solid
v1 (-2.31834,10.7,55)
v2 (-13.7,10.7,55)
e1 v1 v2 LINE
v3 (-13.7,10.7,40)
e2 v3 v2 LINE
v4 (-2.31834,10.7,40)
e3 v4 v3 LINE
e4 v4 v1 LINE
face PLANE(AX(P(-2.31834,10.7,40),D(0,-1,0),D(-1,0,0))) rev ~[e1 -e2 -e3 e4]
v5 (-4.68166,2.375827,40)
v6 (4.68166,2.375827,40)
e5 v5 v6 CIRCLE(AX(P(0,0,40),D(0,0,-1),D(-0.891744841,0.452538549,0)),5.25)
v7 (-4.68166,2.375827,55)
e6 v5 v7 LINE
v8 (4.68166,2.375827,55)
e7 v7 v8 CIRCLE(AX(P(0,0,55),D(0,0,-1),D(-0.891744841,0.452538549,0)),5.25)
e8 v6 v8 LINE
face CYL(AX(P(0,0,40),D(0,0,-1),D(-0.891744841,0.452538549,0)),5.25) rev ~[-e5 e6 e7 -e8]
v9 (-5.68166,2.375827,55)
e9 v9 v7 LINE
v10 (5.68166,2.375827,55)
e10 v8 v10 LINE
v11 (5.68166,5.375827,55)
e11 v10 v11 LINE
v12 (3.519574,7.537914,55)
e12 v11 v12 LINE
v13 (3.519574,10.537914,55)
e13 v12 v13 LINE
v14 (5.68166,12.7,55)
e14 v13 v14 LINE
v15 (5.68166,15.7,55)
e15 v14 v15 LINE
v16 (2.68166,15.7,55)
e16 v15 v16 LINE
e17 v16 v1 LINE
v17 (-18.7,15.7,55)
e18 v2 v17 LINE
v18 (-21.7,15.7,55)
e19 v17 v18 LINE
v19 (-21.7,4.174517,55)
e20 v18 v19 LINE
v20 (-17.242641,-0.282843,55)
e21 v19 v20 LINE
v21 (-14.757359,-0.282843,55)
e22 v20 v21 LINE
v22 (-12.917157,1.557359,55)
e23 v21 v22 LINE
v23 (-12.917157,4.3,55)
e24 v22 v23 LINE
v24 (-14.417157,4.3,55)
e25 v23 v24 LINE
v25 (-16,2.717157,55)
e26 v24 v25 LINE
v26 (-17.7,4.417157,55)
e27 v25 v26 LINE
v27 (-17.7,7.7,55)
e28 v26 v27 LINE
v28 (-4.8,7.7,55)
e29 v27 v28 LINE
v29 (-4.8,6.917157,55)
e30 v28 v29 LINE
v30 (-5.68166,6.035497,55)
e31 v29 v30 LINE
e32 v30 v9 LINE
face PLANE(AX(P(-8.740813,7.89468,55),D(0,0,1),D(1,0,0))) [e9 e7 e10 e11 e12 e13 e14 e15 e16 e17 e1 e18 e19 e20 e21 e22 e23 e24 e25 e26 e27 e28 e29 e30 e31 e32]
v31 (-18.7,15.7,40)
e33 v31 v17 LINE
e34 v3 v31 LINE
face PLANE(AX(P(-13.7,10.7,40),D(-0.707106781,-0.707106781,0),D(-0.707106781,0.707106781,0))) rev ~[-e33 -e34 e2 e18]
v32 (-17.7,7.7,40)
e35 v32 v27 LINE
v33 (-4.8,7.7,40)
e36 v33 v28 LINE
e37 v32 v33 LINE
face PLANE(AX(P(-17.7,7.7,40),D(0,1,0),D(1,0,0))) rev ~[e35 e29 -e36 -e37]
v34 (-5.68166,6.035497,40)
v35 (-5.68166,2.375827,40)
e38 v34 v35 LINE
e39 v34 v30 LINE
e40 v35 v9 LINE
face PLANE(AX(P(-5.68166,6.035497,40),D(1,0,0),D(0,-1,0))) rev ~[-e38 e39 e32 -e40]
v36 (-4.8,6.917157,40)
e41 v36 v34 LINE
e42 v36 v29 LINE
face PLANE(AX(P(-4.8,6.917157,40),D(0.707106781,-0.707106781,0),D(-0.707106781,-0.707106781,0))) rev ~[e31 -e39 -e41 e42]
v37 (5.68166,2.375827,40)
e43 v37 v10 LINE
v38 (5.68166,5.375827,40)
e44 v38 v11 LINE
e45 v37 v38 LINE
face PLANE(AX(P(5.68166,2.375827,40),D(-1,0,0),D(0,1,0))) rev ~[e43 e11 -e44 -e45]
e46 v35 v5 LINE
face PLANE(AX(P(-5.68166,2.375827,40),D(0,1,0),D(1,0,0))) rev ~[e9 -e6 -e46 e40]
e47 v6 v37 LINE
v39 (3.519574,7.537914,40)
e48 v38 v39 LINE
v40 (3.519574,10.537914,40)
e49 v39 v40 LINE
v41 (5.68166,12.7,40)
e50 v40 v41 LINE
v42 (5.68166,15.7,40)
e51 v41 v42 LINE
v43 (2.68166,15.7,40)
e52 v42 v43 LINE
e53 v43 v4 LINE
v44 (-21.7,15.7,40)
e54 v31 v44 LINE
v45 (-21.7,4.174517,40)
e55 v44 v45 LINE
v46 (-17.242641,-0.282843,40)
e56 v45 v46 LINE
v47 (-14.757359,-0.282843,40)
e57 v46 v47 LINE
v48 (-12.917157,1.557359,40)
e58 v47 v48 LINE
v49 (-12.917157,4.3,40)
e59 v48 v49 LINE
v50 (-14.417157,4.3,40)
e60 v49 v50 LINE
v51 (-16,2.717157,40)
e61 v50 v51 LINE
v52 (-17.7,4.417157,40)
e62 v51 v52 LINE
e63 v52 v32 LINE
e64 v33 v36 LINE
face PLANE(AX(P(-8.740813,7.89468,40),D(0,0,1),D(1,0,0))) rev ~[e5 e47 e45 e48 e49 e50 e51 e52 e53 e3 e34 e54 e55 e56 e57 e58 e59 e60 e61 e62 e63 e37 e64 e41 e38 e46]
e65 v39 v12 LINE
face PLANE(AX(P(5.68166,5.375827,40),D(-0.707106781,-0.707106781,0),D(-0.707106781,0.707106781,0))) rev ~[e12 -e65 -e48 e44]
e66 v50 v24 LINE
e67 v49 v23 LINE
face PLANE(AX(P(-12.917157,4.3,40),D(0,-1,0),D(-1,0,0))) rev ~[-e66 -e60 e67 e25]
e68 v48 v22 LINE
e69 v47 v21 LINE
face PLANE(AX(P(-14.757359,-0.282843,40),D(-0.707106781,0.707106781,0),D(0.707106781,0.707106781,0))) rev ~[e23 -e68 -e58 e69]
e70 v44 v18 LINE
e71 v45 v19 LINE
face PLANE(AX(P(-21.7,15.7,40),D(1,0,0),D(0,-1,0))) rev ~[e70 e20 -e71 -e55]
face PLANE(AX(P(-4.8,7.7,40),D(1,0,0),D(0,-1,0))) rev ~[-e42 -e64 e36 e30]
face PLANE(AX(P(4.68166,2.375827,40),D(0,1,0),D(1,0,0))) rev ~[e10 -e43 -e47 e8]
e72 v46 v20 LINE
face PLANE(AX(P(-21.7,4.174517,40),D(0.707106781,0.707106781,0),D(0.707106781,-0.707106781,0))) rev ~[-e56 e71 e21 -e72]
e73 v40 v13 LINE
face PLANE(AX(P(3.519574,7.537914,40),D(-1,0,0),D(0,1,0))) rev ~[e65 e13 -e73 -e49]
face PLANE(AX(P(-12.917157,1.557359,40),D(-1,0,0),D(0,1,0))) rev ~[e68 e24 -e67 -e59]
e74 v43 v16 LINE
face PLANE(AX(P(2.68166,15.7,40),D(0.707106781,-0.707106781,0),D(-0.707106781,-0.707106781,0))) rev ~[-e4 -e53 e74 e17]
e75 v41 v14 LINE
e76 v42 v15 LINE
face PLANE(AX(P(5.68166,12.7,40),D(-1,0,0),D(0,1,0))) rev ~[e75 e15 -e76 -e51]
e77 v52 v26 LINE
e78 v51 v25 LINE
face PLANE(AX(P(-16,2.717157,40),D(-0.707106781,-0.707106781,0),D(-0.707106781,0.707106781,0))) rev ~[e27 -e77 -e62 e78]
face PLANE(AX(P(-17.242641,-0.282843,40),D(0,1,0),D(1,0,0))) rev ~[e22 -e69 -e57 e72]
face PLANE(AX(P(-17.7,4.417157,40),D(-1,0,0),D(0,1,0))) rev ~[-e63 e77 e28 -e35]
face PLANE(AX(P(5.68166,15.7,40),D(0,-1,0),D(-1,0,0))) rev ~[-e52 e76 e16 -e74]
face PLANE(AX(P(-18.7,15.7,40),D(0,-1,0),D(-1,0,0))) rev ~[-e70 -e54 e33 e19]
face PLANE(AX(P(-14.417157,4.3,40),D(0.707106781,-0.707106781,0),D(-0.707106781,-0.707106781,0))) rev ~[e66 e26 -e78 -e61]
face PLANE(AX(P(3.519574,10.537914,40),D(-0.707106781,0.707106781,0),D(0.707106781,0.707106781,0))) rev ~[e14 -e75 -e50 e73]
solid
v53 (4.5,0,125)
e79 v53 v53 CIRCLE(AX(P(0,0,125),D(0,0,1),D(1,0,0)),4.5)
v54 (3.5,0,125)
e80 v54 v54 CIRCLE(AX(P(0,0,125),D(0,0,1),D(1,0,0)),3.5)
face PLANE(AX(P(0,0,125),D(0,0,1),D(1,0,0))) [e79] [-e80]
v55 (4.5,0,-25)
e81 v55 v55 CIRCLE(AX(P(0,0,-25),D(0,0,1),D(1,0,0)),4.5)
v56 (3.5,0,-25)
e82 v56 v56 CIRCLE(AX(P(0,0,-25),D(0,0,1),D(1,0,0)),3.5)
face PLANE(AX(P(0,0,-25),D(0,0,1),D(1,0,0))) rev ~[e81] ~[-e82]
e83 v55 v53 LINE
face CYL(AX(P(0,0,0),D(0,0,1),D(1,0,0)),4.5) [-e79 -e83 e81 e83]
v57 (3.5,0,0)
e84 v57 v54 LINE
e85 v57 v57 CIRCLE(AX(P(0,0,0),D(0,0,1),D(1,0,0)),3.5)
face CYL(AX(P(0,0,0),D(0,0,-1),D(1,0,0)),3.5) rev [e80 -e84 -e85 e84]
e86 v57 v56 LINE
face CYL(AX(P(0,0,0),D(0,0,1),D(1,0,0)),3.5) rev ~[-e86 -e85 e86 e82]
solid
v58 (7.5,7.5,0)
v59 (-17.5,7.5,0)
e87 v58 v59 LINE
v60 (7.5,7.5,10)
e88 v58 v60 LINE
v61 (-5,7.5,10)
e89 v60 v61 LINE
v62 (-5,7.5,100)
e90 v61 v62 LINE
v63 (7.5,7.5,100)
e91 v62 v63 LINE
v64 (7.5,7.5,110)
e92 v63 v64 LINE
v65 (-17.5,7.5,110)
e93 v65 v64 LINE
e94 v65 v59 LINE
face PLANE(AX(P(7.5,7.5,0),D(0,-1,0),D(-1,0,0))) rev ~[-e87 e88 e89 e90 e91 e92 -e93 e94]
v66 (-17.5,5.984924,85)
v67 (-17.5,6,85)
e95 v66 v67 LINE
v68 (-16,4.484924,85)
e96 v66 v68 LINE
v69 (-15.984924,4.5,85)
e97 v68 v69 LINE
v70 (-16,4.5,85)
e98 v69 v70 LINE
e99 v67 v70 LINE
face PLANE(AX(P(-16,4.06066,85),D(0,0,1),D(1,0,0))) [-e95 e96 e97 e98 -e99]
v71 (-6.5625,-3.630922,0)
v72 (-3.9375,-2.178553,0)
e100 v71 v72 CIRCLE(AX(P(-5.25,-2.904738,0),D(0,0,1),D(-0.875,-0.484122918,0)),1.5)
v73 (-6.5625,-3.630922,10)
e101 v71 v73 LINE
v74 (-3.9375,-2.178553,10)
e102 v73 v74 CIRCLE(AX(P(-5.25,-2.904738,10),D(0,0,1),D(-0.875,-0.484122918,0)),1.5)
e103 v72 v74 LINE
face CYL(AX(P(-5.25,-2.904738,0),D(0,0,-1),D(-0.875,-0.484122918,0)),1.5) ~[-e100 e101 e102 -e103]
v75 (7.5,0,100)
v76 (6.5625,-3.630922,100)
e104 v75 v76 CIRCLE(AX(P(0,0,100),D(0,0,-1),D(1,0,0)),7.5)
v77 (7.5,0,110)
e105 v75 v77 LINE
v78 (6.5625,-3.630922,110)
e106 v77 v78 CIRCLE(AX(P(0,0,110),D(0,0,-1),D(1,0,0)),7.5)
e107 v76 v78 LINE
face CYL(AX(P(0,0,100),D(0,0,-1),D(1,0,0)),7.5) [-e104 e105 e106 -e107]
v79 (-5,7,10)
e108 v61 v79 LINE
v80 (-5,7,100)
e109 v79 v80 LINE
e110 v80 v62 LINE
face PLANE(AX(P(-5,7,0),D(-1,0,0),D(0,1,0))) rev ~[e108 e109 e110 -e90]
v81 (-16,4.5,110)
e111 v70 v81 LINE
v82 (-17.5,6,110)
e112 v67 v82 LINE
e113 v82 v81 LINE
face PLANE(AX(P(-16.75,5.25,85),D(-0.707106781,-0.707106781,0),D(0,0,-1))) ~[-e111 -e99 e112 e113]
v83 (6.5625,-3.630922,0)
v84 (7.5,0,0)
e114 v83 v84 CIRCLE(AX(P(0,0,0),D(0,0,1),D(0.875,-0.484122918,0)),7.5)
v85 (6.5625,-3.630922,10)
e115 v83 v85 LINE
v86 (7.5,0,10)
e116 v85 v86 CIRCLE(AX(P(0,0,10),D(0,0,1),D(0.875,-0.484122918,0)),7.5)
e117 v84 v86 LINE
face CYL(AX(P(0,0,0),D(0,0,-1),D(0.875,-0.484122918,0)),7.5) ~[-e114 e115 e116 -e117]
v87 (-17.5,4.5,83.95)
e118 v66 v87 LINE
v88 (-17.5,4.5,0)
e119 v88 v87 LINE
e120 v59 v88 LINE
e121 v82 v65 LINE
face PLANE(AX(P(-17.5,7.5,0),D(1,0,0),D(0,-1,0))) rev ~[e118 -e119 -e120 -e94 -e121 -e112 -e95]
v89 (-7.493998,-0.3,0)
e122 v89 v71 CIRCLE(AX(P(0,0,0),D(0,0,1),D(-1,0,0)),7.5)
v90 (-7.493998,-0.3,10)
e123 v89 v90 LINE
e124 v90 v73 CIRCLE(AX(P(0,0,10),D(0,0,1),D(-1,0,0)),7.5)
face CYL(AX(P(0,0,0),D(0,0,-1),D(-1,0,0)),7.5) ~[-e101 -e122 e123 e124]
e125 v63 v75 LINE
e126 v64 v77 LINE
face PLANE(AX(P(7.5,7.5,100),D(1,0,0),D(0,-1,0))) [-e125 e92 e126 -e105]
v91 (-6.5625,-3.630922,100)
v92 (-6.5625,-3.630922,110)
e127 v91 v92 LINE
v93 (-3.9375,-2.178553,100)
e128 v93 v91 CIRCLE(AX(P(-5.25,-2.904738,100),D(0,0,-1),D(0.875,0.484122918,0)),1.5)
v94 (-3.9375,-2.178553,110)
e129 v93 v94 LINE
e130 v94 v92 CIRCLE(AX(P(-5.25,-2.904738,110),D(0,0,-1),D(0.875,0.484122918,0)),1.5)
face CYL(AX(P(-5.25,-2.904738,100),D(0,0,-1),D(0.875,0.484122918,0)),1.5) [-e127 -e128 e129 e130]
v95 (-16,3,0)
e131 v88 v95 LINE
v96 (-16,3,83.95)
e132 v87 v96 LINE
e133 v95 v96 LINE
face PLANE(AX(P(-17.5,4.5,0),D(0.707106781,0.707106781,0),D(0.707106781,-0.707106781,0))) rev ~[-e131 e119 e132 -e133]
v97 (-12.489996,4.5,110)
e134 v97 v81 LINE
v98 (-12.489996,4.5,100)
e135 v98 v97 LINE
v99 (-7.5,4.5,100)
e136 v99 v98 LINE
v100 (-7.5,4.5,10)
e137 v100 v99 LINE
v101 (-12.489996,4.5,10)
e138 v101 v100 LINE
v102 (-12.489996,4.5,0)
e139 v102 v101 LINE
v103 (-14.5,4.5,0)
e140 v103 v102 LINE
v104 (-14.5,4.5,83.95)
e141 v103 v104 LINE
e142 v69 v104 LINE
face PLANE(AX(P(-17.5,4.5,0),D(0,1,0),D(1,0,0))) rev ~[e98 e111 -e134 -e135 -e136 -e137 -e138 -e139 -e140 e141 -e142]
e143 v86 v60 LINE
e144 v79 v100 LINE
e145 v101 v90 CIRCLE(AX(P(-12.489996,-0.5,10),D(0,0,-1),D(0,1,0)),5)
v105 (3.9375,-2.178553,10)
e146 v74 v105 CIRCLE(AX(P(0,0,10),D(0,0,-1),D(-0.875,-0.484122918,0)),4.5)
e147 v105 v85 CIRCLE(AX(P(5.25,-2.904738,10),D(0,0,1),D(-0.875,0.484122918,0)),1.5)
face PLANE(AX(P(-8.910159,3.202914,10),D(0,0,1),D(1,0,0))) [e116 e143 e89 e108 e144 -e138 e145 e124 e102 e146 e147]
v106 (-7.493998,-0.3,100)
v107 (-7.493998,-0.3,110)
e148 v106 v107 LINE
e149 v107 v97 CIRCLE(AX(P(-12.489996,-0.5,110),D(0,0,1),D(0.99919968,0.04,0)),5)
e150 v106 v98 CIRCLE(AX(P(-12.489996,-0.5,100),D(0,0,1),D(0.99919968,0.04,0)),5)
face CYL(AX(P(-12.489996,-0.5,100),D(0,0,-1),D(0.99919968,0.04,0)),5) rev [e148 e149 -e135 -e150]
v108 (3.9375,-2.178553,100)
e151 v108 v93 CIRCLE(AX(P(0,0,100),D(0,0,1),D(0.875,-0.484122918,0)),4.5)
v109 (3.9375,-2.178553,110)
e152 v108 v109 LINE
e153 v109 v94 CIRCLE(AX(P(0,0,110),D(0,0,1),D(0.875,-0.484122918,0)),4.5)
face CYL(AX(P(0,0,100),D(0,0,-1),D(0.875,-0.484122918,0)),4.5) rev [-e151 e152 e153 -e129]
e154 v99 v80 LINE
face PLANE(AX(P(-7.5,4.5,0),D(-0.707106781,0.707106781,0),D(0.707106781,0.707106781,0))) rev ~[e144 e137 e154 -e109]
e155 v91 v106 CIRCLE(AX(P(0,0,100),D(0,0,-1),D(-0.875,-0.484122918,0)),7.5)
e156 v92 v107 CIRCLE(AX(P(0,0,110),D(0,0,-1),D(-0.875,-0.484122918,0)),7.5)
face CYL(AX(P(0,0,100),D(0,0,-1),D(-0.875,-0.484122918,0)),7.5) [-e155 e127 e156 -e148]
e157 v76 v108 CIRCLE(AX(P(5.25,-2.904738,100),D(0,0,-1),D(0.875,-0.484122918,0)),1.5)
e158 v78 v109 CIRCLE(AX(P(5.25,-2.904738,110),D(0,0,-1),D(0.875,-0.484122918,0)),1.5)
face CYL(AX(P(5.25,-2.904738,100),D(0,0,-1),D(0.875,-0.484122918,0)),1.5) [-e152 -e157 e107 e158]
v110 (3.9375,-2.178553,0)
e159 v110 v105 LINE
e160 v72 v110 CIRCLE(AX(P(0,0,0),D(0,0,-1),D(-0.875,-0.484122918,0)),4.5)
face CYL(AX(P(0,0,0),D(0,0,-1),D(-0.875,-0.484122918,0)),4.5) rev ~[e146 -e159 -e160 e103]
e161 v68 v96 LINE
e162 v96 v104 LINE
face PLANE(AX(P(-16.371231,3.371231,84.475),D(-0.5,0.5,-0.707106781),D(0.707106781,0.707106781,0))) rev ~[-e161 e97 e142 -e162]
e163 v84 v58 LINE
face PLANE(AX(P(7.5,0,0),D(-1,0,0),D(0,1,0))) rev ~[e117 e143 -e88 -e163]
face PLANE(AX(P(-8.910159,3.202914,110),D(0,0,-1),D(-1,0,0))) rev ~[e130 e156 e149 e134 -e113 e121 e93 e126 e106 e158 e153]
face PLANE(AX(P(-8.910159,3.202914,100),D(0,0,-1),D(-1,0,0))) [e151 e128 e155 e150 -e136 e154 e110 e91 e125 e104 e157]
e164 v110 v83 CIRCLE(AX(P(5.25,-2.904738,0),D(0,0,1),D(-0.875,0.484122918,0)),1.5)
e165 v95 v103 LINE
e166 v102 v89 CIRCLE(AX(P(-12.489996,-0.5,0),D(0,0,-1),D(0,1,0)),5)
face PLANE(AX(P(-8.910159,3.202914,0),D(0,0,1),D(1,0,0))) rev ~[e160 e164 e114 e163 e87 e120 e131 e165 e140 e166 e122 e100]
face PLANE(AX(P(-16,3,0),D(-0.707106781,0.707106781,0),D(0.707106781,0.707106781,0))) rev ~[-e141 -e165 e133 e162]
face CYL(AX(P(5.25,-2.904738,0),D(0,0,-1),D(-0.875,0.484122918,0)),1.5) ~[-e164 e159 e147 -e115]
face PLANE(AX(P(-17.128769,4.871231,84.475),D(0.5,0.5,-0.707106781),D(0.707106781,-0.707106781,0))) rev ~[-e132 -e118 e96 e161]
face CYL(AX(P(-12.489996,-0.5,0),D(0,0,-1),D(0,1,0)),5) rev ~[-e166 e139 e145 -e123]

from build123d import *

# Parameters (mm, degrees)
F3_DEPTH      = 10
F4_START      = -100
F4_DEPTH      = 10
F5_DEPTH      = 110
F6_DEPTH      = 85
F7_T1_DEPTH   = 10
F7_T3_DEPTH   = 10
F1_R          = 4.5
F1_R_2        = 3.5
F8_DEPTH      = 125
F8_DEPTH_BACK = 25
F9_START      = 40
F9_DEPTH      = 15
F10_SIZE      = 1.5
F11_SIZE      = 1.05


# Not quite as in the source:
# - a fillet or chamfer that OpenCascade refuses, or shapes differently, is made with other operations: its cross-section is extruded or revolved along the edge and cut away or added
# - a feature names something its author has since deleted; it is built from what else it names


with BuildPart() as f3:
    # F0 (on Top) → F3 (new body)
    with BuildSketch(Plane.XY):
        Polygon((-14.5, 4.5), (-7.5, 4.5), (-5, 7), (-5, 7.5), (-17.5, 7.5), (-17.5, 4.5), align=None)
        with BuildLine():
            ThreePointArc((-7.5, 0), (-7.2618437741, -1.875), (-6.5625, -3.6309218871))
            ThreePointArc((-6.5625, -3.6309218871), (-4.5238156226, -4.2172375097), (-3.9375, -2.1785531322))
            ThreePointArc((-3.9375, -2.1785531322), (0, 4.5), (3.9375, -2.1785531322))
            ThreePointArc((3.9375, -2.1785531322), (4.5238156226, -4.2172375097), (6.5625, -3.6309218871))
            ThreePointArc((6.5625, -3.6309218871), (7.2618437741, -1.875), (7.5, 0))
            Line((7.5, 0), (7.5, 7.5))
            Line((7.5, 7.5), (-5, 7.5))
            Line((-5, 7.5), (-5, 7))
            Line((-5, 7), (-7.5, 4.5))
            Line((-7.5, 4.5), (-7.5, 0))
        make_face()
    extrude(amount=F3_DEPTH)



with BuildPart() as f4:
    # F3_face (on face) → F4 (new body)
    with BuildSketch(Plane(origin=(-2.7583074733, 3.5975142137, 0), x_dir=(1, 0, 0), z_dir=(0, 0, -1)).offset(F4_START)):
        with BuildLine():
            Line((-14.7416925267, -3.9024857863), (10.2583074733, -3.9024857863))
            Line((10.2583074733, -3.9024857863), (10.2583074733, 3.5975142137))
            ThreePointArc((10.2583074733, 3.5975142137), (10.0201512474, 5.4725142137), (9.3208074733, 7.2284361007))
            ThreePointArc((9.3208074733, 7.2284361007), (7.2821230959, 7.8147517233), (6.6958074733, 5.7760673459))
            ThreePointArc((6.6958074733, 5.7760673459), (2.7583074733, -0.9024857863), (-1.1791925267, 5.7760673459))
            ThreePointArc((-1.1791925267, 5.7760673459), (-1.7655081493, 7.8147517233), (-3.8041925267, 7.2284361007))
            ThreePointArc((-3.8041925267, 7.2284361007), (-4.5035363009, 5.4725142137), (-4.7416925267, 3.5975142137))
            Line((-4.7416925267, 3.5975142137), (-4.7416925267, -0.9024857863))
            Line((-4.7416925267, -0.9024857863), (-14.7416925267, -0.9024857863))
            Line((-14.7416925267, -0.9024857863), (-14.7416925267, -3.9024857863))
        make_face()
    extrude(amount=-F4_DEPTH)


with BuildPart() as f3_1:
    add(f3.part)

    add(f4.part)  # F5 merges F4
    # F0 (on Top) → F5 (join, through all)
    with BuildSketch(Plane.XY):
        Polygon((-14.5, 4.5), (-7.5, 4.5), (-5, 7), (-5, 7.5), (-17.5, 7.5), (-17.5, 4.5), align=None)
    extrude(amount=F5_DEPTH)

    # F0 (on Top) → F6 (join)
    with BuildSketch(Plane.XY):
        Polygon((-16, 3), (-14.5, 4.5), (-17.5, 4.5), align=None)
    extrude(amount=F6_DEPTH)

    # F7: fillet of radius 5 on 2 edges, made by hand

    # F7_s2 → F7_t1 (join)
    with BuildSketch(Plane.XY):
        with BuildLine():
            ThreePointArc((-12.4899959968, 4.5), (-9.0258943817, 3.1055512755), (-7.4939975981, -0.3))
            Line((-7.4939975981, -0.3), (-6.9943977582, -0.28))
            ThreePointArc((-6.9943977582, -0.28), (-7, 0), (-7, 4.5))
            Line((-7, 4.5), (-7.5, 5))
            Line((-7.5, 5), (-12.4899959968, 5))
            Line((-12.4899959968, 5), (-12.4899959968, 4.5))
        make_face()
    extrude(amount=F7_T1_DEPTH)

    # F7_s4 → F7_t3 (join)
    with BuildSketch(Plane.XY.offset(100)):
        with BuildLine():
            ThreePointArc((-7.4939975981, -0.3), (-9.0258943817, 3.1055512755), (-12.4899959968, 4.5))
            Line((-12.4899959968, 4.5), (-12.4899959968, 5))
            Line((-12.4899959968, 5), (-7.5, 5))
            Line((-7.5, 5), (-7, 4.5))
            ThreePointArc((-7, 4.5), (-7, 0), (-6.9943977582, -0.28))
            Line((-6.9943977582, -0.28), (-7.4939975981, -0.3))
        make_face()
    extrude(amount=F7_T3_DEPTH)

    # F10
    f10_edges = [f3_1.edges().sort_by_distance(p)[0] for p in [
        (-17.5, 4.5, 97.5),
    ]]
    chamfer(f10_edges, length=F10_SIZE)

    # F11
    f11_edges = [f3_1.edges().sort_by_distance(p)[0] for p in [
        (-16.75, 3.75, 85),
        (-15.25, 3.75, 85),
    ]]
    chamfer(f11_edges, length=F11_SIZE)


with BuildPart() as f8:
    # F1 (on Top) → F8 (new body, two sides)
    with BuildSketch(Plane.XY) as f8_sk:
        Circle(F1_R)
        Circle(F1_R_2, mode=Mode.SUBTRACT)
    extrude(amount=F8_DEPTH)
    extrude(f8_sk.sketch, amount=-F8_DEPTH_BACK)


with BuildPart() as f9:
    # F2 (on Top) → F9 (new body)
    with BuildSketch(Plane.XY.offset(F9_START)):
        with BuildLine():
            Line((-16, 2.7171572875), (-17.7, 4.4171572875))
            Line((-17.7, 4.4171572875), (-17.7, 7.7))
            Line((-17.7, 7.7), (-4.8, 7.7))
            Line((-4.8, 7.7), (-4.8, 6.9171572875))
            Line((-4.8, 6.9171572875), (-5.6816604165, 6.035496871))
            Line((-5.6816604165, 6.035496871), (-5.6816604165, 2.375827381))
            Line((-5.6816604165, 2.375827381), (-4.6816604165, 2.375827381))
            ThreePointArc((-4.6816604165, 2.375827381), (0, 5.25), (4.6816604165, 2.375827381))
            Line((4.6816604165, 2.375827381), (5.6816604165, 2.375827381))
            Line((5.6816604165, 2.375827381), (5.6816604165, 5.375827381))
            Line((5.6816604165, 5.375827381), (3.519574107, 7.5379136905))
            Line((3.519574107, 7.5379136905), (3.519574107, 10.5379136905))
            Line((3.519574107, 10.5379136905), (5.6816604165, 12.7))
            Line((5.6816604165, 12.7), (5.6816604165, 15.7))
            Line((5.6816604165, 15.7), (2.6816604165, 15.7))
            Line((2.6816604165, 15.7), (-2.3183395835, 10.7))
            Line((-2.3183395835, 10.7), (-13.7, 10.7))
            Line((-13.7, 10.7), (-18.7, 15.7))
            Line((-18.7, 15.7), (-21.7, 15.7))
            Line((-21.7, 15.7), (-21.7, 4.1745166004))
            Line((-21.7, 4.1745166004), (-17.2426406871, -0.2828427125))
            Line((-17.2426406871, -0.2828427125), (-14.7573593129, -0.2828427125))
            Line((-14.7573593129, -0.2828427125), (-12.9171572875, 1.5573593129))
            Line((-12.9171572875, 1.5573593129), (-12.9171572875, 4.3))
            Line((-12.9171572875, 4.3), (-14.4171572875, 4.3))
            Line((-14.4171572875, 4.3), (-16, 2.7171572875))
        make_face()
    extrude(amount=F9_DEPTH)


solid = Compound([f3_1.part, f8.part, f9.part])
